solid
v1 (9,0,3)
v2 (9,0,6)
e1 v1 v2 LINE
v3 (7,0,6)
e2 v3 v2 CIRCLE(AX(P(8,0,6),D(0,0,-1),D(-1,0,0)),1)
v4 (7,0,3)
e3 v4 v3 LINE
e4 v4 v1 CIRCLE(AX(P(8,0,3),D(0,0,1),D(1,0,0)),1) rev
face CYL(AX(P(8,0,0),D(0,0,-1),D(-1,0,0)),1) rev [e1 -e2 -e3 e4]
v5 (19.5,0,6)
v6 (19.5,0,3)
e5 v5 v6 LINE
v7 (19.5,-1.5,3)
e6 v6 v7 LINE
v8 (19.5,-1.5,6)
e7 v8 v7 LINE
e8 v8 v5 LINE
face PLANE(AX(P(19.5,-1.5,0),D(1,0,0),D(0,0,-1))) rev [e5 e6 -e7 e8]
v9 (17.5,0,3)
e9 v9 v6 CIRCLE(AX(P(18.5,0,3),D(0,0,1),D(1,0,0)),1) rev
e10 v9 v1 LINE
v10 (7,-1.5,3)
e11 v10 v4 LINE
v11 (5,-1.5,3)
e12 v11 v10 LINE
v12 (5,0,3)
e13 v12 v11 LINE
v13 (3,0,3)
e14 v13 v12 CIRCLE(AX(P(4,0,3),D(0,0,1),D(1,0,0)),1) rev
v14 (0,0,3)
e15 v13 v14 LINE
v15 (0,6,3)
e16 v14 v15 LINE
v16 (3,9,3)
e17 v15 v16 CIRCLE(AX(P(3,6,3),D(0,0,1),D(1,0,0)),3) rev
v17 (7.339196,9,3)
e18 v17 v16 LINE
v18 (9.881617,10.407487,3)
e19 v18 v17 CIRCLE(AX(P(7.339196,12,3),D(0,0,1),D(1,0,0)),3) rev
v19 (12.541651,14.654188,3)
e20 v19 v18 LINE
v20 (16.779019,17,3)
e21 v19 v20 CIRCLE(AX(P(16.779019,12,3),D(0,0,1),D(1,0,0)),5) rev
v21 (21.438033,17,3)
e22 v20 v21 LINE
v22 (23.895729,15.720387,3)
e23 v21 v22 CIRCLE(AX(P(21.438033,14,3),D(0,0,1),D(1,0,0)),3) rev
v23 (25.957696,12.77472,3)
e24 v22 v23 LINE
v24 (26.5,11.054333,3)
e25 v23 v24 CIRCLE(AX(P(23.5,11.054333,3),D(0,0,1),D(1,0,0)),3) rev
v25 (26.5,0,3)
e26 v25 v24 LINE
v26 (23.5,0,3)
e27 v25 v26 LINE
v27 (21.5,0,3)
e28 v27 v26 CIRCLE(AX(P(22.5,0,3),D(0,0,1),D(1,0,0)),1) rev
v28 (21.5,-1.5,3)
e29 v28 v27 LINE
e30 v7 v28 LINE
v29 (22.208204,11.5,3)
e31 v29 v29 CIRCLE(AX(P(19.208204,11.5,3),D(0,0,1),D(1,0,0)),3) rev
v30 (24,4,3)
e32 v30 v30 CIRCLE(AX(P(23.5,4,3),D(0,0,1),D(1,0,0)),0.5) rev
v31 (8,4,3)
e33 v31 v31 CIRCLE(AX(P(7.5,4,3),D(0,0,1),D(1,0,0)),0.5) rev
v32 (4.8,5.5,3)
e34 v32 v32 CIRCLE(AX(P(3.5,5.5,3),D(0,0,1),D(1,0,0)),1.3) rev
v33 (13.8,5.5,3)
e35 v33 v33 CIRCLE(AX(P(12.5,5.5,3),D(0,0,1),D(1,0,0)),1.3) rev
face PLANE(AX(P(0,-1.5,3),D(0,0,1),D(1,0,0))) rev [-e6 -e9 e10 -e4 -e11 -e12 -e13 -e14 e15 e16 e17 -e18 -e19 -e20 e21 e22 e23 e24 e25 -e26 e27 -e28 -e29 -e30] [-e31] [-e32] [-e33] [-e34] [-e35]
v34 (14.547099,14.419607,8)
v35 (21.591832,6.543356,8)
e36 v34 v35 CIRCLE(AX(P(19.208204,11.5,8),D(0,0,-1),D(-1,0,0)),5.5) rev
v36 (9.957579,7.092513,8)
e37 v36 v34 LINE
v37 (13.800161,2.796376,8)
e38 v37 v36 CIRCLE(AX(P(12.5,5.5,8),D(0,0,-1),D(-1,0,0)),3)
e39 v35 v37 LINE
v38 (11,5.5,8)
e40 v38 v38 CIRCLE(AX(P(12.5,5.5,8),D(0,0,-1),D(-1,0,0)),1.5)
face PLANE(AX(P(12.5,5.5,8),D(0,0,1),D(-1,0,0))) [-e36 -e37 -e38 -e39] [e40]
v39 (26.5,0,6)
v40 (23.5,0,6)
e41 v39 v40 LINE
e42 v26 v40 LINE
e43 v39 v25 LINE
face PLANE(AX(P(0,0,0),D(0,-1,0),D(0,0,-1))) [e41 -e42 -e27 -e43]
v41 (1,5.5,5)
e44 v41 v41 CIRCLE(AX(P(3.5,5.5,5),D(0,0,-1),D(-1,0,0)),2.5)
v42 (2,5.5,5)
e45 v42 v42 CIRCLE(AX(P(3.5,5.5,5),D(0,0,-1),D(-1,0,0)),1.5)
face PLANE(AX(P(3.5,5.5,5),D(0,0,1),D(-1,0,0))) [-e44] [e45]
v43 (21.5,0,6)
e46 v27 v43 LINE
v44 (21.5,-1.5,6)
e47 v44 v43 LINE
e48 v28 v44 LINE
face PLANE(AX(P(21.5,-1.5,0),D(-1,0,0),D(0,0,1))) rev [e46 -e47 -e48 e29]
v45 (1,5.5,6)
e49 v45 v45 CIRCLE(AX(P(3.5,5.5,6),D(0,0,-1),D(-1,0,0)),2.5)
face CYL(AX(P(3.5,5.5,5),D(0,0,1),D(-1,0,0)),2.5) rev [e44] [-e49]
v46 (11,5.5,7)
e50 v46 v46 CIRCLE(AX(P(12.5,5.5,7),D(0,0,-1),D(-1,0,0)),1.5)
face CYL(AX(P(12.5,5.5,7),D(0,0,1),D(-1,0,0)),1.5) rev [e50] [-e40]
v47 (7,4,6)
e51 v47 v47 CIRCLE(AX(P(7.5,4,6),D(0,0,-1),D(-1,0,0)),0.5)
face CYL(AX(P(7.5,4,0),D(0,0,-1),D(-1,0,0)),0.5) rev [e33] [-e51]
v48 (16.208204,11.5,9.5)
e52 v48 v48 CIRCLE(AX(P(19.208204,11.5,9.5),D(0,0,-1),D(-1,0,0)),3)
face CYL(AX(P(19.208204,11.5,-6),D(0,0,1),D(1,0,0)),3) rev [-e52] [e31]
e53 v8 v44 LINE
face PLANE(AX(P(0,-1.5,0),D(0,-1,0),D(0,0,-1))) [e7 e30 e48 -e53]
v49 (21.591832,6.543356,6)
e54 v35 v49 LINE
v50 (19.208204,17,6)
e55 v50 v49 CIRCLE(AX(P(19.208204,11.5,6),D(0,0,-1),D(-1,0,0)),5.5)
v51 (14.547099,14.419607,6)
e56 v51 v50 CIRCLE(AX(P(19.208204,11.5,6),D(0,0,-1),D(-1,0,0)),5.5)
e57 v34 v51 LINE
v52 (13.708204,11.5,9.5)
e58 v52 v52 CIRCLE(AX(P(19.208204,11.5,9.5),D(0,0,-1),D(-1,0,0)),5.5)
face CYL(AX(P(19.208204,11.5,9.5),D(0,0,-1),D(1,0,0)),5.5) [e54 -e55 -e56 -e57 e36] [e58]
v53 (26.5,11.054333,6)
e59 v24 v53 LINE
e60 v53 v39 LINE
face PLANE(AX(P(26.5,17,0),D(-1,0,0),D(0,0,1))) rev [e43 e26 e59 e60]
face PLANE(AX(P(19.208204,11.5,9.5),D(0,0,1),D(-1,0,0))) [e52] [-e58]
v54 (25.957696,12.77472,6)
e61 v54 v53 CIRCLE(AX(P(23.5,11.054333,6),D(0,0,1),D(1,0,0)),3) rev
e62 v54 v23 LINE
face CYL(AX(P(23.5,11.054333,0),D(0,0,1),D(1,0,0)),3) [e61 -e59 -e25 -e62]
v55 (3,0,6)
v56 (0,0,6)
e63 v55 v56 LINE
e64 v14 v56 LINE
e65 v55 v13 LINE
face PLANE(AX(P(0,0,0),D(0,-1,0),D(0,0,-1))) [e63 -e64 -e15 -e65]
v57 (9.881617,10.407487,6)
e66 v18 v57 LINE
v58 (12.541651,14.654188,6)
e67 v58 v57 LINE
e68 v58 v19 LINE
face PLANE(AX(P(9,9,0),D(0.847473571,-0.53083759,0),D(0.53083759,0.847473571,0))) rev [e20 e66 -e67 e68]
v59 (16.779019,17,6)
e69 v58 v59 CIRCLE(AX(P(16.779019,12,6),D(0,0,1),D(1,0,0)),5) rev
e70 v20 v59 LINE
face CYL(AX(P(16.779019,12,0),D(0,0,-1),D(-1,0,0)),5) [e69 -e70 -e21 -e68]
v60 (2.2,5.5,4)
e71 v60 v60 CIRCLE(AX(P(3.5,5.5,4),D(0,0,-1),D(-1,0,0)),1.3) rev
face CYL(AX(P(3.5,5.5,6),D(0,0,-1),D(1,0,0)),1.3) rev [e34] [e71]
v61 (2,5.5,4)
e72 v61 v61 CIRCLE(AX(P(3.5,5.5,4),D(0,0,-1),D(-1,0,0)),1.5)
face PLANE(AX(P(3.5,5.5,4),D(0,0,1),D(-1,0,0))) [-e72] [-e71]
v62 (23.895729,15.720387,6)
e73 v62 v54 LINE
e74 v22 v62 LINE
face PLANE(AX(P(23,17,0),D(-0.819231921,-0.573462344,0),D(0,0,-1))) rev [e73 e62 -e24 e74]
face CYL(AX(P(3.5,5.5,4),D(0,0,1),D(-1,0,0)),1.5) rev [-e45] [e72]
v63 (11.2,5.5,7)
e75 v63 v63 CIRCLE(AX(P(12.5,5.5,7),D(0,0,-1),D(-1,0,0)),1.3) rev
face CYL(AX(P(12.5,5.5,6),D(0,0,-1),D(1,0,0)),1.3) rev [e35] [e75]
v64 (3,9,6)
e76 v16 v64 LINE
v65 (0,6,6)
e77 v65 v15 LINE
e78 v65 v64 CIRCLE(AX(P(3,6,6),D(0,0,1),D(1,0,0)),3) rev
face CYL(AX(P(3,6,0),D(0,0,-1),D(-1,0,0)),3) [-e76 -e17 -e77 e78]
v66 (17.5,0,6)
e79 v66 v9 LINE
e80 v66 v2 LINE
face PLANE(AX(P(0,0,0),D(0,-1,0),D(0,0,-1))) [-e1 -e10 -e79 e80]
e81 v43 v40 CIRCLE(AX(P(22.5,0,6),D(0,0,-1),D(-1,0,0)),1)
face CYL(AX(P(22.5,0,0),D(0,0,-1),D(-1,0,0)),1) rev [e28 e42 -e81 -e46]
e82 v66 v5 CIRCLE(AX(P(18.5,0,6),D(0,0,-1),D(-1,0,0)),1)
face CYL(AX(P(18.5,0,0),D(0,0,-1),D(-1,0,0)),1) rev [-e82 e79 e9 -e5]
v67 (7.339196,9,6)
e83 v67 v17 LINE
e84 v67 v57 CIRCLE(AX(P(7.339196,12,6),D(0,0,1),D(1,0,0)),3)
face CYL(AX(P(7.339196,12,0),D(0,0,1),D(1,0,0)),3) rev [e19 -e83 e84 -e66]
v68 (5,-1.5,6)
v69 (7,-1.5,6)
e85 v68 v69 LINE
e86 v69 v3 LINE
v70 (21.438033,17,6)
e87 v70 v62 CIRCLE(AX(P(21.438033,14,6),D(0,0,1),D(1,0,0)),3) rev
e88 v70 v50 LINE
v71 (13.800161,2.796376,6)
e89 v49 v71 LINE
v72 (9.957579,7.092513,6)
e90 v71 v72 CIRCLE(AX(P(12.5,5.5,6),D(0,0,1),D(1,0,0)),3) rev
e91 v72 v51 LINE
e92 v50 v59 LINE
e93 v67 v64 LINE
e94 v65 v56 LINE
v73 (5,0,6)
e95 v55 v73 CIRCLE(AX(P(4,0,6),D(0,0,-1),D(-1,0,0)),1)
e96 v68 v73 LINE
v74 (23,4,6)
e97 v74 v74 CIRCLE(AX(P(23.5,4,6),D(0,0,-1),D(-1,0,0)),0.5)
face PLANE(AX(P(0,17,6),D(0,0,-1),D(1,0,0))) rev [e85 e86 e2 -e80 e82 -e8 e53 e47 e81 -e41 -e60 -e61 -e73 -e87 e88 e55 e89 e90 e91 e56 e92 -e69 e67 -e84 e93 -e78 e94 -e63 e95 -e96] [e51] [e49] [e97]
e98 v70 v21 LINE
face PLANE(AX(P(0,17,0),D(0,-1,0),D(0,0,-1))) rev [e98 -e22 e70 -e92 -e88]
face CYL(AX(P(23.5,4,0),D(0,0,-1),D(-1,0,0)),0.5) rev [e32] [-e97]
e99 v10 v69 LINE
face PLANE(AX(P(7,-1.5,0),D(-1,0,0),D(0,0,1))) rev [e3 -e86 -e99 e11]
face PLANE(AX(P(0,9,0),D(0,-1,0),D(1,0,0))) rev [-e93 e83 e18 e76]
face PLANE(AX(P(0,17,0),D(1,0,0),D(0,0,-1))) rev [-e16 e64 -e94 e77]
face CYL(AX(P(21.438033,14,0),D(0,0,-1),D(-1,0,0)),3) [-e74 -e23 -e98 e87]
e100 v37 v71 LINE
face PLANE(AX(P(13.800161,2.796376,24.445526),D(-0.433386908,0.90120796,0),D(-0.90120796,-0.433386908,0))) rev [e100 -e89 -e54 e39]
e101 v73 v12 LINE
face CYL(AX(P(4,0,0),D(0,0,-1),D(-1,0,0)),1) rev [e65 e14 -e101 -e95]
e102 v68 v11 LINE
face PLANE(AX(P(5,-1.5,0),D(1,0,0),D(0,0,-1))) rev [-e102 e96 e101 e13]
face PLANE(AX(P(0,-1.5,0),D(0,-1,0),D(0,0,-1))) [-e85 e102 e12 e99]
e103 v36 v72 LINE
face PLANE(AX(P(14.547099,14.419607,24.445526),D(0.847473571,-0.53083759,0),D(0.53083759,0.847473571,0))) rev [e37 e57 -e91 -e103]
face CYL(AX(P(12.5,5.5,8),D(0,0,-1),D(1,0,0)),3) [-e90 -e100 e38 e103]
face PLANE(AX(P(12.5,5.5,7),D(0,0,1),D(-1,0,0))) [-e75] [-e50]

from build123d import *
from build123d.topology import SkipClean

# Parameters (mm, degrees)
SKETCH1_W                            = 26.5
SKETCH1_H                            = 6
BOSS_EXTRUDE1_DEPTH                  = 17
SKETCH2_R                            = 1.5
CUT_EXTRUDE1_DEPTH                   = 1
SKETCH3_R                            = 1.3
CUT_EXTRUDE2_DEPTH                   = 32.878676259
SKETCH4_R                            = 3
CUT_EXTRUDE3_DEPTH                   = 33.050741021
SKETCH5_R                            = 2.5
CUT_EXTRUDE4_DEPTH                   = 1.5
SKETCH6_R                            = 1.5
CUT_EXTRUDE8_DEPTH                   = 1
SKETCH7_R                            = 1.3
CUT_EXTRUDE9_DEPTH                   = 32.678068123
CUT_EXTRUDE10_START                  = -1
SKETCH8_R                            = 2.5
CUT_EXTRUDE10_DEPTH                  = 1
CUT_EXTRUDE11_START                  = -1
SKETCH9_R                            = 1.5
CUT_EXTRUDE11_DEPTH                  = 1
SKETCH10_R                           = 5.5
SKETCH10_R_2                         = 3
BOSS_EXTRUDE2_DEPTH                  = 3.5
SKETCH11_R                           = 3
SKETCH11_R_2                         = 1.3
BOSS_EXTRUDE4_DEPTH                  = 2
CUT_EXTRUDE12_START                  = -1
SKETCH12_R                           = 1.5
CUT_EXTRUDE12_DEPTH                  = 1
SKETCH17_W                           = 2
SKETCH17_H                           = 6
BOSS_EXTRUDE6_DEPTH                  = 1.5
SKETCH18_R                           = 1
CUT_EXTRUDE17_DEPTH                  = 33.050741021
CHAMFER2_SIZE                        = 5
CHAMFER2_SIZE2                       = 3.5
FILLET11_R                           = 3
BOSS_EXTRUDE7_DEPTH                  = 2
CUT_EXTRUDE19_DEPTH                  = 33.050741021
FILLET13_R                           = 5
FILLET14_R                           = 3
FILLET15_R                           = 3
SKIZZE1_R                            = 0.5
SCHNITT_LINEAR_AUSTRAGEN1_DEPTH      = 33.050741021
SPIEGELN1_OUTLINE_R                  = 3
SPIEGELN1_OUTLINE_R_2                = 2.5
SPIEGELN1_OUTLINE_R_3                = 0.5
SPIEGELN1_OUTLINE_R_4                = 1.5
SPIEGELN1_DEPTH                      = 6
SPIEGELN1_START                      = 6
SPIEGELN1_2_OUTLINE_R                = 5.5
SPIEGELN1_2_OUTLINE_R_2              = 3
SPIEGELN1_2_DEPTH                    = 3.5
SPIEGELN1_3_OUTLINE_R                = 1.5
SPIEGELN1_3_DEPTH                    = 2
SPIEGELN1_START_2                    = 1.5
SPIEGELN1_4_OUTLINE_R                = 1.5
SPIEGELN1_4_OUTLINE_R_2              = 1.3
SPIEGELN1_4_OUTLINE_R_3              = 2.5
SPIEGELN1_4_DEPTH                    = 3.5
SPIEGELN1_START_3                    = 1
SPIEGELN1_5_OUTLINE_R                = 1.5
SPIEGELN1_5_OUTLINE_R_2              = 1.3
SPIEGELN1_5_DEPTH                    = 6
SPIEGELN1_START_4                    = 2.5
SPIEGELN1_6_OUTLINE_R                = 1.5
SPIEGELN1_6_OUTLINE_R_2              = 1.3
SPIEGELN1_6_DEPTH                    = 1.5
SCHNITT_LINEAR_AUSTRAGEN2_DEPTH      = 31.409702399
SCHNITT_LINEAR_AUSTRAGEN2_DEPTH_BACK = 31.409702399
SKIZZE2_W                            = 26.5
SKIZZE2_H                            = 9.5
SCHNITT_LINEAR_AUSTRAGEN3_DEPTH      = 31.409702399
SCHNITT_LINEAR_AUSTRAGEN3_DEPTH_BACK = 31.409702399
SKIZZE3_W                            = 26.5
SKIZZE3_H                            = 3


# Read off the part's stored shape, not the designer's step: Spiegeln1
with BuildPart() as part:
    # Sketch1 → Boss-Extrude1 (new body)
    with BuildSketch(Plane(origin=(0, 0, 0), x_dir=(1, 0, 0), z_dir=(0, 1, 0))):
        with Locations((13.25, 3)):
            Rectangle(SKETCH1_W, SKETCH1_H)
    extrude(amount=BOSS_EXTRUDE1_DEPTH)

    # Sketch2 → Cut-Extrude1 (cut)
    with BuildSketch(Plane.XY):
        with Locations((12.5, 5.5)):
            Circle(SKETCH2_R)
    extrude(amount=-CUT_EXTRUDE1_DEPTH, mode=Mode.SUBTRACT)

    # Sketch3 → Cut-Extrude2 (cut, through all)
    with BuildSketch(Plane.XY.offset(-1)):
        with Locations((12.5, 5.5)):
            Circle(SKETCH3_R)
    extrude(amount=-CUT_EXTRUDE2_DEPTH, mode=Mode.SUBTRACT)

    # Sketch4 → Cut-Extrude3 (cut, through all)
    with BuildSketch(Plane.XY):
        with Locations((19.208203932, 11.5)):
            Circle(SKETCH4_R)
    extrude(amount=-CUT_EXTRUDE3_DEPTH, mode=Mode.SUBTRACT)

    # Sketch5 → Cut-Extrude4 (cut)
    with BuildSketch(Plane.XY):
        with Locations((3.5, 5.5)):
            Circle(SKETCH5_R)
    extrude(amount=-CUT_EXTRUDE4_DEPTH, mode=Mode.SUBTRACT)

    # Sketch6 → Cut-Extrude8 (cut)
    with BuildSketch(Plane.XY.offset(-1.5)):
        with Locations((3.5, 5.5)):
            Circle(SKETCH6_R)
    extrude(amount=-CUT_EXTRUDE8_DEPTH, mode=Mode.SUBTRACT)

    # Sketch7 → Cut-Extrude9 (cut, through all)
    with BuildSketch(Plane.XY.offset(-2.5)):
        with Locations((3.5, 5.5)):
            Circle(SKETCH7_R)
    extrude(amount=-CUT_EXTRUDE9_DEPTH, mode=Mode.SUBTRACT)

    # Sketch8 → Cut-Extrude10 (cut)
    with BuildSketch(Plane(origin=(0, 0, -6), x_dir=(-1, 0, 0), z_dir=(0, 0, -1)).offset(CUT_EXTRUDE10_START)):
        with Locations(Location((-3.5, 5.5, 0), (0, 0, 180))):
            Circle(SKETCH8_R)
    extrude(amount=CUT_EXTRUDE10_DEPTH, mode=Mode.SUBTRACT)

    # Sketch9 → Cut-Extrude11 (cut)
    with BuildSketch(Plane(origin=(0, 0, -5), x_dir=(-1, 0, 0), z_dir=(0, 0, -1)).offset(CUT_EXTRUDE11_START)):
        with Locations(Location((-3.5, 5.5, 0), (0, 0, 180))):
            Circle(SKETCH9_R)
    extrude(amount=CUT_EXTRUDE11_DEPTH, mode=Mode.SUBTRACT)

    # Sketch10 → Boss-Extrude2 (add)
    with BuildSketch(Plane(origin=(0, 0, -6), x_dir=(-1, 0, 0), z_dir=(0, 0, -1))):
        with Locations(Location((-19.208203932, 11.5, 0), (0, 0, 90))):
            Circle(SKETCH10_R)
        with Locations(Location((-19.208203932, 11.5, 0), (0, 0, 180))):
            Circle(SKETCH10_R_2, mode=Mode.SUBTRACT)
    extrude(amount=BOSS_EXTRUDE2_DEPTH)

    # Sketch11 → Boss-Extrude4 (add)
    with BuildSketch(Plane(origin=(0, 0, -6), x_dir=(-1, 0, 0), z_dir=(0, 0, -1))):
        with Locations(Location((-12.5, 5.5, 0), (0, 0, 180))):
            Circle(SKETCH11_R)
        with Locations(Location((-12.5, 5.5, 0), (0, 0, 180))):
            Circle(SKETCH11_R_2, mode=Mode.SUBTRACT)
    extrude(amount=BOSS_EXTRUDE4_DEPTH)

    # Sketch12 → Cut-Extrude12 (cut)
    with BuildSketch(Plane(origin=(0, 0, -8), x_dir=(-1, 0, 0), z_dir=(0, 0, -1)).offset(CUT_EXTRUDE12_START)):
        with Locations(Location((-12.5, 5.5, 0), (0, 0, 180))):
            Circle(SKETCH12_R)
    extrude(amount=CUT_EXTRUDE12_DEPTH, mode=Mode.SUBTRACT)

    # Sketch17 → Boss-Extrude6 (add)
    with BuildSketch(Plane.XZ):
        with Locations((6, -3)):
            Rectangle(SKETCH17_W, SKETCH17_H)
        with Locations((20.5, -3)):
            Rectangle(SKETCH17_W, SKETCH17_H)
    extrude(amount=BOSS_EXTRUDE6_DEPTH)

    # Sketch18 → Cut-Extrude17 (cut, through all)
    with BuildSketch(Plane(origin=(0, 0, -6), x_dir=(-1, 0, 0), z_dir=(0, 0, -1))):
        with Locations((-22.5, 0)):
            Circle(SKETCH18_R)
        with Locations((-18.5, 0)):
            Circle(SKETCH18_R)
        with Locations((-8, 0)):
            Circle(SKETCH18_R)
        with Locations((-4, 0)):
            Circle(SKETCH18_R)
    extrude(amount=-CUT_EXTRUDE17_DEPTH, mode=Mode.SUBTRACT)

    # Chamfer2
    chamfer2_edges = [part.edges().sort_by_distance(p)[0] for p in [
        (26.5, 17, -3),
    ]]
    chamfer2_side = [part.faces().sort_by_distance(p)[0] for p in [
        (26.5, 8.5, -3),
    ]]
    chamfer(chamfer2_edges, length=CHAMFER2_SIZE, length2=CHAMFER2_SIZE2, reference=chamfer2_side[0])

    # Fillet11
    fillet11_edges = [part.edges().sort_by_distance(p)[0] for p in [
        (23, 17, -3),
        (26.5, 12, -3),
    ]]
    fillet(fillet11_edges, radius=FILLET11_R)

    # Sketch19 → Boss-Extrude7 (add)
    with BuildSketch(Plane(origin=(0, 0, -6), x_dir=(-1, 0, 0), z_dir=(0, 0, -1))):
        with BuildLine():
            Line((-14.547099294, 14.419606745), (-9.957579288, 7.09251277))
            ThreePointArc((-9.957579288, 7.09251277), (-14.736067977, 7.5), (-13.800160725, 2.796376119))
            Line((-13.800160725, 2.796376119), (-21.591831928, 6.543356218))
            ThreePointArc((-21.591831928, 6.543356218), (-15.108745974, 7.833333333), (-14.547099294, 14.419606745))
        make_face()
    extrude(amount=BOSS_EXTRUDE7_DEPTH)

    # Sketch20 → Cut-Extrude19 (cut, through all)
    with BuildSketch(Plane(origin=(0, 0, -6), x_dir=(-1, 0, 0), z_dir=(0, 0, -1))):
        Polygon((0, 17), (-14.011012575, 17), (-9, 9), (0, 9), align=None)
    extrude(amount=-CUT_EXTRUDE19_DEPTH, mode=Mode.SUBTRACT)

    # Fillet13
    fillet13_edges = [part.edges().sort_by_distance(p)[0] for p in [
        (14.011012575, 17, -3),
    ]]
    fillet(fillet13_edges, radius=FILLET13_R)

    # Fillet14
    fillet14_edges = [part.edges().sort_by_distance(p)[0] for p in [
        (9, 9, -3),
    ]]
    fillet(fillet14_edges, radius=FILLET14_R)

    # Fillet15
    fillet15_edges = [part.edges().sort_by_distance(p)[0] for p in [
        (0, 9, -3),
    ]]
    fillet(fillet15_edges, radius=FILLET15_R)

    # Skizze1 → Schnitt-Linear austragen1 (cut, through all)
    with BuildSketch(Plane(origin=(0, 0, -6), x_dir=(-1, 0, 0), z_dir=(0, 0, -1))):
        with Locations((-23.5, 4)):
            Circle(SKIZZE1_R)
        with Locations((-7.5, 4)):
            Circle(SKIZZE1_R)
    extrude(amount=-SCHNITT_LINEAR_AUSTRAGEN1_DEPTH, mode=Mode.SUBTRACT)

    # Spiegeln1 outline → Spiegeln1 (add)
    with SkipClean():  # the faces are left unmerged after this step: merging them gives an invalid solid
        with BuildSketch(Plane.XY):
            with BuildLine():
                Line((21.438033315, 17), (16.779018718, 17))
                ThreePointArc((16.779018718, 17), (14.357339523, 16.374410803), (12.541650865, 14.65418795))
                Line((12.541650865, 14.65418795), (9.881617026, 10.40748723))
                ThreePointArc((9.881617026, 10.40748723), (8.792203831, 9.375353518), (7.339196314, 9))
                Line((7.339196314, 9), (3, 9))
                ThreePointArc((3, 9), (0.878679656, 8.121320344), (0, 6))
                Line((0, 6), (0, 0))
                Line((0, 0), (3, 0))
                ThreePointArc((3, 0), (4, 1), (5, 0))
                Line((5, 0), (5, -1.5))
                Line((5, -1.5), (7, -1.5))
                Line((7, -1.5), (7, 0))
                ThreePointArc((7, 0), (8, 1), (9, 0))
                Line((9, 0), (17.5, 0))
                ThreePointArc((17.5, 0), (18.5, 1), (19.5, 0))
                Line((19.5, 0), (19.5, -1.5))
                Line((19.5, -1.5), (21.5, -1.5))
                Line((21.5, -1.5), (21.5, 0))
                ThreePointArc((21.5, 0), (22.5, 1), (23.5, 0))
                Line((23.5, 0), (26.5, 0))
                Line((26.5, 0), (26.5, 11.054333308))
                ThreePointArc((26.5, 11.054333308), (26.361213666, 11.956251462), (25.957695762, 12.774720341))
                Line((25.957695762, 12.774720341), (23.895729077, 15.720387033))
                ThreePointArc((23.895729077, 15.720387033), (22.823464458, 16.660936029), (21.438033315, 17))
            make_face()
            with Locations((19.208203932, 11.5)):
                Circle(SPIEGELN1_OUTLINE_R, mode=Mode.SUBTRACT)
            with Locations((3.5, 5.5)):
                Circle(SPIEGELN1_OUTLINE_R_2, mode=Mode.SUBTRACT)
            with Locations((7.5, 4)):
                Circle(SPIEGELN1_OUTLINE_R_3, mode=Mode.SUBTRACT)
            with Locations((23.5, 4)):
                Circle(SPIEGELN1_OUTLINE_R_3, mode=Mode.SUBTRACT)
            with Locations((12.5, 5.5)):
                Circle(SPIEGELN1_OUTLINE_R_4, mode=Mode.SUBTRACT)
        extrude(amount=SPIEGELN1_DEPTH)

    # Spiegeln1 2 outline → Spiegeln1 2 (add)
    with SkipClean():  # the faces are left unmerged after this step: merging them gives an invalid solid
        with BuildSketch(Plane.XY.offset(SPIEGELN1_START)):
            with Locations((19.208203932, 11.5)):
                Circle(SPIEGELN1_2_OUTLINE_R)
            with Locations((19.208203932, 11.5)):
                Circle(SPIEGELN1_2_OUTLINE_R_2, mode=Mode.SUBTRACT)
        extrude(amount=SPIEGELN1_2_DEPTH)

    # Spiegeln1 3 outline → Spiegeln1 3 (add)
    with SkipClean():  # the faces are left unmerged after this step: merging them gives an invalid solid
        with BuildSketch(Plane.XY.offset(SPIEGELN1_START)):
            with BuildLine():
                ThreePointArc((21.591831928, 6.543356218), (15.108745973, 7.833333333), (14.547099293, 14.419606745))
                Line((14.547099293, 14.419606745), (9.957579288, 7.09251277))
                ThreePointArc((9.957579288, 7.09251277), (10.263932023, 3.5), (13.800160725, 2.796376119))
                Line((13.800160725, 2.796376119), (21.591831928, 6.543356218))
            make_face()
            with Locations((12.5, 5.5)):
                Circle(SPIEGELN1_3_OUTLINE_R, mode=Mode.SUBTRACT)
        extrude(amount=SPIEGELN1_3_DEPTH)

    # Spiegeln1 4 outline → Spiegeln1 4 (add)
    # profile 1 of 2: a face of its own
    with SkipClean():  # the faces are left unmerged after this step: merging them gives an invalid solid
        with BuildSketch(Plane.XY.offset(SPIEGELN1_START_2)):
            with Locations((12.5, 5.5)):
                Circle(SPIEGELN1_4_OUTLINE_R)
            with Locations((12.5, 5.5)):
                Circle(SPIEGELN1_4_OUTLINE_R_2, mode=Mode.SUBTRACT)
        # profile 2 of 2: a face of its own
        with BuildSketch(Plane.XY.offset(SPIEGELN1_START_2)):
            with Locations((3.5, 5.5)):
                Circle(SPIEGELN1_4_OUTLINE_R_3)
            with Locations((3.5, 5.5)):
                Circle(SPIEGELN1_4_OUTLINE_R, mode=Mode.SUBTRACT)
        extrude(amount=SPIEGELN1_4_DEPTH)

    # Spiegeln1 5 outline → Spiegeln1 5 (add)
    with SkipClean():  # the faces are left unmerged after this step: merging them gives an invalid solid
        with BuildSketch(Plane.XY.offset(SPIEGELN1_START_3)):
            with Locations((12.5, 5.5)):
                Circle(SPIEGELN1_5_OUTLINE_R)
            with Locations((12.5, 5.5)):
                Circle(SPIEGELN1_5_OUTLINE_R_2, mode=Mode.SUBTRACT)
        extrude(amount=SPIEGELN1_5_DEPTH)

    # Spiegeln1 6 outline → Spiegeln1 6 (add)
    with SkipClean():  # the faces are left unmerged after this step: merging them gives an invalid solid
        with BuildSketch(Plane.XY.offset(SPIEGELN1_START_4)):
            with Locations((3.5, 5.5)):
                Circle(SPIEGELN1_6_OUTLINE_R)
            with Locations((3.5, 5.5)):
                Circle(SPIEGELN1_6_OUTLINE_R_2, mode=Mode.SUBTRACT)
        extrude(amount=SPIEGELN1_6_DEPTH)

    # Skizze2 → Schnitt-Linear austragen2 (cut, two sides: drawn at the far end of the back side and taken through both)
    with BuildSketch(Plane(origin=(0, 5.5, 0), x_dir=(1, 0, 0), z_dir=(0, 1, 0)).offset(-SCHNITT_LINEAR_AUSTRAGEN2_DEPTH_BACK)):
        with Locations((13.25, 4.75)):
            Rectangle(SKIZZE2_W, SKIZZE2_H)
    extrude(amount=SCHNITT_LINEAR_AUSTRAGEN2_DEPTH + SCHNITT_LINEAR_AUSTRAGEN2_DEPTH_BACK, mode=Mode.SUBTRACT)

    # Skizze3 → Schnitt-Linear austragen3 (cut, two sides: drawn at the far end of the back side and taken through both)
    with BuildSketch(Plane(origin=(0, 5.5, 0), x_dir=(1, 0, 0), z_dir=(0, 1, 0)).offset(-SCHNITT_LINEAR_AUSTRAGEN3_DEPTH_BACK)):
        with Locations((13.25, -1.5)):
            Rectangle(SKIZZE3_W, SKIZZE3_H)
    extrude(amount=SCHNITT_LINEAR_AUSTRAGEN3_DEPTH + SCHNITT_LINEAR_AUSTRAGEN3_DEPTH_BACK, mode=Mode.SUBTRACT)


solid = part.part
